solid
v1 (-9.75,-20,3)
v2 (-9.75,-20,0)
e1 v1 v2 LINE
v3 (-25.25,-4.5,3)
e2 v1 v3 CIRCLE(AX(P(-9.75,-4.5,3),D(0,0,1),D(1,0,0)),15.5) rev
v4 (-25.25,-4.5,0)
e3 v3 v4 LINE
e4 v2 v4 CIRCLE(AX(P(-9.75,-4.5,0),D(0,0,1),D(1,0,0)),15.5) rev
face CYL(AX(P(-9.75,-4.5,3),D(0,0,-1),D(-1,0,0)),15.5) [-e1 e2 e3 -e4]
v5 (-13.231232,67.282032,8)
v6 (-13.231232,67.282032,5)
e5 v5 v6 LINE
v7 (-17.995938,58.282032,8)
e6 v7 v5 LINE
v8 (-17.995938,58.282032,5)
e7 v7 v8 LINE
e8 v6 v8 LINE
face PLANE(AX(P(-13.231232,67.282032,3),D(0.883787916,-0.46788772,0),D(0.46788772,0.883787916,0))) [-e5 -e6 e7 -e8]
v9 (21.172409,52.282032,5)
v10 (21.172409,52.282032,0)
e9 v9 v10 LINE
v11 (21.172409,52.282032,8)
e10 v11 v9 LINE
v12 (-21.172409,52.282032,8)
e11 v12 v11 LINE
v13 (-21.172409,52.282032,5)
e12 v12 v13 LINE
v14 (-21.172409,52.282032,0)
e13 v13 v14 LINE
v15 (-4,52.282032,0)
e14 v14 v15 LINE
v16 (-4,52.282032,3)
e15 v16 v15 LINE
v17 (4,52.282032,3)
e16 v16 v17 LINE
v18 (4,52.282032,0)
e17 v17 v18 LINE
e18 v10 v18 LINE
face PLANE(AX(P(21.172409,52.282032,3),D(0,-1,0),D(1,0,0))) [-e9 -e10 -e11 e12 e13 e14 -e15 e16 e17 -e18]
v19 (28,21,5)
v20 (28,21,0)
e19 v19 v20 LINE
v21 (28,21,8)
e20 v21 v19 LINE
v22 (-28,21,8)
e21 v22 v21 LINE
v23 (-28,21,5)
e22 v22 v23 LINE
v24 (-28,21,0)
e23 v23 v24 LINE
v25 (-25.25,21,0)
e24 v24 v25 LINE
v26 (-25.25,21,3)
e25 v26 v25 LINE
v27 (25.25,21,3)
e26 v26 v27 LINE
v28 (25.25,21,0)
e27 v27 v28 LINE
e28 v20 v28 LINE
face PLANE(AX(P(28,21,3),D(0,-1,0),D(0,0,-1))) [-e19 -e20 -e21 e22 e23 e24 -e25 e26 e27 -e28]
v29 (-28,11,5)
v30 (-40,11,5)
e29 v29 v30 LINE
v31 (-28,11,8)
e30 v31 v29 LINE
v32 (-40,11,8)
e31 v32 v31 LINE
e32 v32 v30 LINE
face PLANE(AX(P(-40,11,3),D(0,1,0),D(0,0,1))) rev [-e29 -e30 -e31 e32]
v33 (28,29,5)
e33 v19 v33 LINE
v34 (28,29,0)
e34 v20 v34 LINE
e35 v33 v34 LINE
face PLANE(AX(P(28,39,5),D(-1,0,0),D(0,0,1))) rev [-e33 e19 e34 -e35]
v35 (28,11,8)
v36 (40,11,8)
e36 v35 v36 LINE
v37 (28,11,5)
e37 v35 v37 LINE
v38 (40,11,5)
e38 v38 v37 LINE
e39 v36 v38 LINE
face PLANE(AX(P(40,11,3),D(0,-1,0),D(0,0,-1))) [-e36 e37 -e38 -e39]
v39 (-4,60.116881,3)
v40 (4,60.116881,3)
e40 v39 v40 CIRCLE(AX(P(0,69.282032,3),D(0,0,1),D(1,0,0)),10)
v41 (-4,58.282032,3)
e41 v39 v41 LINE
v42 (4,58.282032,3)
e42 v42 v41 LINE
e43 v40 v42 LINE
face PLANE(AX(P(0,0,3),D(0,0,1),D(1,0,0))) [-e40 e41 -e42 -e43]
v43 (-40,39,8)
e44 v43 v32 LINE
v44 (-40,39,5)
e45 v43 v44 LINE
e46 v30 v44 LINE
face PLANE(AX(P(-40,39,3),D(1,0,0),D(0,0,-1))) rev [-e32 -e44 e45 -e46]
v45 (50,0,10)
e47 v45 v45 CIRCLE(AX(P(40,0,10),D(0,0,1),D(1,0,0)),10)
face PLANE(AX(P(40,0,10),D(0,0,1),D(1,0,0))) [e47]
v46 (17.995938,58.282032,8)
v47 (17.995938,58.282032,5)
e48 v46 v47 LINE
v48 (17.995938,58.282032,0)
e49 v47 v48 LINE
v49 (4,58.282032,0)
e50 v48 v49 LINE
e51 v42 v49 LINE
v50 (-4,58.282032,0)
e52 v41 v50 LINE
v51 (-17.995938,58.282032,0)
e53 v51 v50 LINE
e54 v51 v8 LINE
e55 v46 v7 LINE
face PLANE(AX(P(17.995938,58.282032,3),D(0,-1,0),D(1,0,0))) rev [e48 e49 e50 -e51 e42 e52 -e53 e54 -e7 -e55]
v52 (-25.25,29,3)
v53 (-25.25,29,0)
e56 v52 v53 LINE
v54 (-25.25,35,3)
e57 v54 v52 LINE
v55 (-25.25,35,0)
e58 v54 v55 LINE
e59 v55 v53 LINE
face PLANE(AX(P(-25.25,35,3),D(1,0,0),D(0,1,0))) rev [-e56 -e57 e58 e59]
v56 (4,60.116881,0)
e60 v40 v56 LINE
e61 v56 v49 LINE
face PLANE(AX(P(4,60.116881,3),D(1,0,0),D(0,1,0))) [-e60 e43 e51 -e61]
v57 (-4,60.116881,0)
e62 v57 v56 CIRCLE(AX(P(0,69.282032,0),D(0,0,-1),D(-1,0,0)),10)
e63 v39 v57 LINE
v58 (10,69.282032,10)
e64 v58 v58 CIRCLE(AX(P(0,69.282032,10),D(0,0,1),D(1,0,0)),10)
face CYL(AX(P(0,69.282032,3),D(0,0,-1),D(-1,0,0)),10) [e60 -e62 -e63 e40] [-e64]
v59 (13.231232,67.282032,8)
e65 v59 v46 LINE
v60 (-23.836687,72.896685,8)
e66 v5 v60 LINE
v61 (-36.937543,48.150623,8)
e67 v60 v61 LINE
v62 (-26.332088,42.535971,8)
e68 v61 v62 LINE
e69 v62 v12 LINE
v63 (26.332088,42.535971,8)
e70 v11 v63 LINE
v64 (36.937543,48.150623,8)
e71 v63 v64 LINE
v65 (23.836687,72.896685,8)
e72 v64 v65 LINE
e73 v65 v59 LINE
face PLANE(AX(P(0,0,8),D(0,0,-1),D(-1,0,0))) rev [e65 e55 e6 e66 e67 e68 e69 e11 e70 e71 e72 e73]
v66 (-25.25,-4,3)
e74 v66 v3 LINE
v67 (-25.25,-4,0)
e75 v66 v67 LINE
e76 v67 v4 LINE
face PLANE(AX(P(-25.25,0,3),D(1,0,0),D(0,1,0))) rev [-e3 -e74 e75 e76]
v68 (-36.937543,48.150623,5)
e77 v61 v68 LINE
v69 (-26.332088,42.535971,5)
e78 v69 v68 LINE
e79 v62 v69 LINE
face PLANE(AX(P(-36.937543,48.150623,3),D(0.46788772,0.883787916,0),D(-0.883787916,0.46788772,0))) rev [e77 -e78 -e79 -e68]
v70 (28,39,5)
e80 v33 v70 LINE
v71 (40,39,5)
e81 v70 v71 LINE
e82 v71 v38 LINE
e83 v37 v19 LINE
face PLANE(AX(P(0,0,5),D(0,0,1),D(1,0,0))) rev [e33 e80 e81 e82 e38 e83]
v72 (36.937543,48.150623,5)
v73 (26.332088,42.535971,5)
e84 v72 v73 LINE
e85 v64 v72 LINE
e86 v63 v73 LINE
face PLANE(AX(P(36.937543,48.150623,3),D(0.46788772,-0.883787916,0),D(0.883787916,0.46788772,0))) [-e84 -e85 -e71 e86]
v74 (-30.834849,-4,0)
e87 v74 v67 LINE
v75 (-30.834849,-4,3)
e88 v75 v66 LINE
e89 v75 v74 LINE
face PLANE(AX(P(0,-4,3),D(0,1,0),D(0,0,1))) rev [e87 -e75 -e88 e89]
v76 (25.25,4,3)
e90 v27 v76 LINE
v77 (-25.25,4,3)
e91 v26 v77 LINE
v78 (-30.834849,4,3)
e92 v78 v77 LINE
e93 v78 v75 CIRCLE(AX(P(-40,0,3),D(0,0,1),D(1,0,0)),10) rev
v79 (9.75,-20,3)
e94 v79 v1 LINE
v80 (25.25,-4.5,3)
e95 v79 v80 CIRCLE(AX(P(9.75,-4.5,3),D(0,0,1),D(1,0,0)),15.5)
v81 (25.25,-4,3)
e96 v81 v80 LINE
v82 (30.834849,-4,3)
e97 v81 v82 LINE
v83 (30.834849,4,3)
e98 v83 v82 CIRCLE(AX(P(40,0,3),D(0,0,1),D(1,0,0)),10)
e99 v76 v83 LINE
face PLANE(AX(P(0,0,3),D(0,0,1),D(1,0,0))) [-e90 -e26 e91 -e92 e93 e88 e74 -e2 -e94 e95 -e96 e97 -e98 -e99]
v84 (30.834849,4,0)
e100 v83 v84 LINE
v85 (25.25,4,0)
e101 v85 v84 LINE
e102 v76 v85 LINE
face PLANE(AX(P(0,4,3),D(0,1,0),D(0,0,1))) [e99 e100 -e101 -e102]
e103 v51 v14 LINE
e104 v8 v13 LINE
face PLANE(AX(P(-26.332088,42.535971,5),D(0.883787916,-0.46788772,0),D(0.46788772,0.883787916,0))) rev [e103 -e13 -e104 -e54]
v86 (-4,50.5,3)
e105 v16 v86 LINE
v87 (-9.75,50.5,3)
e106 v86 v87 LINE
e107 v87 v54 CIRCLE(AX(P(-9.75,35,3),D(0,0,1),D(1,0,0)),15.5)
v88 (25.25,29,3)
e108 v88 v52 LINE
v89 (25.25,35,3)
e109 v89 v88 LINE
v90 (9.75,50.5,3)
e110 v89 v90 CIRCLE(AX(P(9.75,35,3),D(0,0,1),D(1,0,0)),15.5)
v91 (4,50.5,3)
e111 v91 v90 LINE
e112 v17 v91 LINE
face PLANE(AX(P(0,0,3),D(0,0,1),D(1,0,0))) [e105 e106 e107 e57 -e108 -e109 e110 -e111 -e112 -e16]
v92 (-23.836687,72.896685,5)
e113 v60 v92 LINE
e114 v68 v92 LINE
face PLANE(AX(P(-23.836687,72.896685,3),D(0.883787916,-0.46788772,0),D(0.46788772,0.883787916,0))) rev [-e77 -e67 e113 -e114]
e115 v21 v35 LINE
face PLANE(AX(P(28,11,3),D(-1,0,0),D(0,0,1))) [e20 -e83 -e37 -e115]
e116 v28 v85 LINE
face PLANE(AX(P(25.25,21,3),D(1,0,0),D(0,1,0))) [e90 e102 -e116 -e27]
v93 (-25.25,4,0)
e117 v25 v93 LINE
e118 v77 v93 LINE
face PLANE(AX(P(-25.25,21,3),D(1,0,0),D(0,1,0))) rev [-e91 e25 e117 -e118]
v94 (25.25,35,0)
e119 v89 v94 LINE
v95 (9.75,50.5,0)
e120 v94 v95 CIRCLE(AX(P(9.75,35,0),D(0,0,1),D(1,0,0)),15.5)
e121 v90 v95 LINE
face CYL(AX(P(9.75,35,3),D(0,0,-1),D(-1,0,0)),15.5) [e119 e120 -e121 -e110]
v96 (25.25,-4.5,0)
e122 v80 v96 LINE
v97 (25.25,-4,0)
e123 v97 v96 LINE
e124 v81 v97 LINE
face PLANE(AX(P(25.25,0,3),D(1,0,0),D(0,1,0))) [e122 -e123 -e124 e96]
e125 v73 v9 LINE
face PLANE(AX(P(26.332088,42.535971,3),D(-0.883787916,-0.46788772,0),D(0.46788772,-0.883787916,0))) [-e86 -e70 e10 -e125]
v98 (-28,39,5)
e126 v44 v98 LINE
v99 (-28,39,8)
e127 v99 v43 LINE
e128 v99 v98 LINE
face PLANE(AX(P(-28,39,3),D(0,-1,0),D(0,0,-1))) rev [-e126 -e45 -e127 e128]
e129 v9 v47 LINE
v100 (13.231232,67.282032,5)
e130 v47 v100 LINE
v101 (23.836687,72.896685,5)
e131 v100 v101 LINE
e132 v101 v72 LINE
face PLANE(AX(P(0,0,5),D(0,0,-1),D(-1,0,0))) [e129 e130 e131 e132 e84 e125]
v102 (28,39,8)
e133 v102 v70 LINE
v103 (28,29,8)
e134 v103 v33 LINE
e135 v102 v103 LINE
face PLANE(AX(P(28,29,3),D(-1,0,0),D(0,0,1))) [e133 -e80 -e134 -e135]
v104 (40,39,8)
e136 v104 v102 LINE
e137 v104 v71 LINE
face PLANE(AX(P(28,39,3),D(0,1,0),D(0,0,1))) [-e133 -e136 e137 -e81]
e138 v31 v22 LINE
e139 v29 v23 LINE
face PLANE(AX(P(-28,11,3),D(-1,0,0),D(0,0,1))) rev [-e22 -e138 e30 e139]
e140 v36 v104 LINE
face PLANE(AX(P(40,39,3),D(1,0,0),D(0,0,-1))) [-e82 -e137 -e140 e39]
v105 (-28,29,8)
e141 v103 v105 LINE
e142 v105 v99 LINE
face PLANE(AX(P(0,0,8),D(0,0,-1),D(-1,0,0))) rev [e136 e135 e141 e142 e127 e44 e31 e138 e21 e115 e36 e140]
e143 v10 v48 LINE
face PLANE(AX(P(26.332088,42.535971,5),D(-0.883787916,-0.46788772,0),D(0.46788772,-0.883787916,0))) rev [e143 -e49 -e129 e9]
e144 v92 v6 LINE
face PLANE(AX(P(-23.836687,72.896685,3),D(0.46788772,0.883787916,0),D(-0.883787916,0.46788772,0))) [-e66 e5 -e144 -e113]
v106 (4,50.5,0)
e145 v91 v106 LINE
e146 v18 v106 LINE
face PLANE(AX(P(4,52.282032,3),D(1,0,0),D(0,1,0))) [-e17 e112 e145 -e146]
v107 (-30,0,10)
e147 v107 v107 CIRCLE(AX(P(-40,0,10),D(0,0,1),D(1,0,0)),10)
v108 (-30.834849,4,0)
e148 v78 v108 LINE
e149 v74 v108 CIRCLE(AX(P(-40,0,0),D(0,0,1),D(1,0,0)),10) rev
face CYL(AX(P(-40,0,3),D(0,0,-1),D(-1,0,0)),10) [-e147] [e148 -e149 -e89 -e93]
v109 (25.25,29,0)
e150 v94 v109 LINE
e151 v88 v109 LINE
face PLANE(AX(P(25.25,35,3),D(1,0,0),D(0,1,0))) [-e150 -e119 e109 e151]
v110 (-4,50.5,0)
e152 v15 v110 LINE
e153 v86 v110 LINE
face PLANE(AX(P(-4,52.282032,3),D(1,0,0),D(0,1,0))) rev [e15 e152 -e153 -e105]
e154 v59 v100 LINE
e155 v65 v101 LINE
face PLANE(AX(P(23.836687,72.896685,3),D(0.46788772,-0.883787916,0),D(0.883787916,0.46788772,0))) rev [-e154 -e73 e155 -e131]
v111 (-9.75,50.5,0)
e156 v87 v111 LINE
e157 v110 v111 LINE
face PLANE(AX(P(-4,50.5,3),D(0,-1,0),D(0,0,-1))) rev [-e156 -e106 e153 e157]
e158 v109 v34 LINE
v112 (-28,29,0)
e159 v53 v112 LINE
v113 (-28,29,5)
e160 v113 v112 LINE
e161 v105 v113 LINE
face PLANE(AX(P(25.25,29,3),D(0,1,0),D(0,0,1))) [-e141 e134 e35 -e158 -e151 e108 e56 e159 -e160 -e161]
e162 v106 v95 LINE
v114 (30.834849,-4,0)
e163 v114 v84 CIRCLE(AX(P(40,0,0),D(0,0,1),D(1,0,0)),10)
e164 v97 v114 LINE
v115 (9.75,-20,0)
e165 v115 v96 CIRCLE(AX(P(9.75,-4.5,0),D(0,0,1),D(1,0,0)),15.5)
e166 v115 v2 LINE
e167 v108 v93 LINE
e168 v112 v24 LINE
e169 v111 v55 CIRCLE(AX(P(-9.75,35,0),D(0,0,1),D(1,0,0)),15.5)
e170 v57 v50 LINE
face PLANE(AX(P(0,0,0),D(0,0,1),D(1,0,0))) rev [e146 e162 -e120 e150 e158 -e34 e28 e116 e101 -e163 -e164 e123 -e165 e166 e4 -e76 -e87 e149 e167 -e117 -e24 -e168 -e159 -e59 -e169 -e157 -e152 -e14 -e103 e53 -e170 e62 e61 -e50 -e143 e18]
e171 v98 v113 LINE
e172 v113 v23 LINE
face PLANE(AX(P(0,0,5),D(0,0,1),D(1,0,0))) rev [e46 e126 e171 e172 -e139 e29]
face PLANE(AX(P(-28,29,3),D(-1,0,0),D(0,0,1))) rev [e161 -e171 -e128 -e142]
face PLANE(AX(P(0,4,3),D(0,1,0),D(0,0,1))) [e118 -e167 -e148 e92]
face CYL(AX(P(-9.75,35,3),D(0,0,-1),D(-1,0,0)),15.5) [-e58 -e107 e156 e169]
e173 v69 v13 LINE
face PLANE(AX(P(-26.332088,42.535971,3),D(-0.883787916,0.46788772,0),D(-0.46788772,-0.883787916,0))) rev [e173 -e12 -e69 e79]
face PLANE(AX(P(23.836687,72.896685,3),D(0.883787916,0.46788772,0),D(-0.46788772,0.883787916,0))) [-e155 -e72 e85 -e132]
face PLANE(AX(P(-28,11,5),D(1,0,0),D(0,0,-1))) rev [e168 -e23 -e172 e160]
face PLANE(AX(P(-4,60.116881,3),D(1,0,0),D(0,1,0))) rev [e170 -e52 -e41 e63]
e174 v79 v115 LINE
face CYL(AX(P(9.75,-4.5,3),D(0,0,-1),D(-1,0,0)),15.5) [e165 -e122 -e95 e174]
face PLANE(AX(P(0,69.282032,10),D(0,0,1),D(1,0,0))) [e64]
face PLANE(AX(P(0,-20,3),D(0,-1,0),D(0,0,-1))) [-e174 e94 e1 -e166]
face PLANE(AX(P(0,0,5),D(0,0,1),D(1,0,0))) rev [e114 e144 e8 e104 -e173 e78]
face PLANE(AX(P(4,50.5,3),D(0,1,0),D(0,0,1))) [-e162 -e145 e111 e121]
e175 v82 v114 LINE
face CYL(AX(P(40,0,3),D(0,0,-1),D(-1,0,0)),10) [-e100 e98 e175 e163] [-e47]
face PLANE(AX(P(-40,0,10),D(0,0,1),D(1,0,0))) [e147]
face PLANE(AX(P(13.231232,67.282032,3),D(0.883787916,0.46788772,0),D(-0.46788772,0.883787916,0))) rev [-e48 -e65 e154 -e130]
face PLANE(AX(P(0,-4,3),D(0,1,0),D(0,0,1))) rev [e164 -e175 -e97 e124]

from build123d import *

# Parameters (mm, degrees)
BOSS_EXTRU_1_DEPTH      = 3
ESQUISSE2_R             = 10
BOSS_EXTRU_2_DEPTH      = 7
BOSS_EXTRU_3_DEPTH      = 5
ESQUISSE4_W             = 12
ESQUISSE4_H             = 28
ENL_V_MAT_EXTRU_1_DEPTH = 5


# Read off the part's stored shape, not the designer's step: Boss.-Extru.1
with BuildPart() as part:
    # Boss.-Extru.1 outline → Boss.-Extru.1 (new body)
    with BuildSketch(Plane.XY):
        with BuildLine():
            ThreePointArc((-25.25, -4.5), (-20.710155108, -15.460155108), (-9.75, -20))
            Line((-9.75, -20), (9.75, -20))
            ThreePointArc((9.75, -20), (20.710155108, -15.460155108), (25.25, -4.5))
            Line((25.25, -4.5), (25.25, -4))
            Line((25.25, -4), (30.83484861, -4))
            ThreePointArc((30.83484861, -4), (50, 0), (30.83484861, 4))
            Line((30.83484861, 4), (25.25, 4))
            Line((25.25, 4), (25.25, 21))
            Line((25.25, 21), (28, 21))
            Line((28, 21), (28, 11))
            Line((28, 11), (40, 11))
            Line((40, 11), (40, 39))
            Line((40, 39), (28, 39))
            Line((28, 39), (28, 29))
            Line((28, 29), (25.25, 29))
            Line((25.25, 29), (25.25, 35))
            ThreePointArc((25.25, 35), (20.710155108, 45.960155108), (9.75, 50.5))
            Line((9.75, 50.5), (4, 50.5))
            Line((4, 50.5), (4, 52.282032303))
            Line((4, 52.282032303), (21.172408726, 52.282032303))
            Line((21.172408726, 52.282032303), (26.332088428, 42.535970645))
            Line((26.332088428, 42.535970645), (36.937543424, 48.15062329))
            Line((36.937543424, 48.15062329), (23.836687252, 72.896684948))
            Line((23.836687252, 72.896684948), (13.231232256, 67.282032303))
            Line((13.231232256, 67.282032303), (17.995938138, 58.282032303))
            Line((17.995938138, 58.282032303), (4, 58.282032303))
            Line((4, 58.282032303), (4, 60.116880913))
            ThreePointArc((4, 60.116880913), (0, 79.282032303), (-4, 60.116880913))
            Line((-4, 60.116880913), (-4, 58.282032303))
            Line((-4, 58.282032303), (-17.995938138, 58.282032303))
            Line((-17.995938138, 58.282032303), (-13.231232256, 67.282032303))
            Line((-13.231232256, 67.282032303), (-23.836687252, 72.896684948))
            Line((-23.836687252, 72.896684948), (-36.937543424, 48.15062329))
            Line((-36.937543424, 48.15062329), (-26.332088428, 42.535970645))
            Line((-26.332088428, 42.535970645), (-21.172408726, 52.282032303))
            Line((-21.172408726, 52.282032303), (-4, 52.282032303))
            Line((-4, 52.282032303), (-4, 50.5))
            Line((-4, 50.5), (-9.75, 50.5))
            ThreePointArc((-9.75, 50.5), (-20.710155108, 45.960155108), (-25.25, 35))
            Line((-25.25, 35), (-25.25, 29))
            Line((-25.25, 29), (-28, 29))
            Line((-28, 29), (-28, 39))
            Line((-28, 39), (-40, 39))
            Line((-40, 39), (-40, 11))
            Line((-40, 11), (-28, 11))
            Line((-28, 11), (-28, 21))
            Line((-28, 21), (-25.25, 21))
            Line((-25.25, 21), (-25.25, 4))
            Line((-25.25, 4), (-30.83484861, 4))
            ThreePointArc((-30.83484861, 4), (-50, 0), (-30.83484861, -4))
            Line((-30.83484861, -4), (-25.25, -4))
            Line((-25.25, -4), (-25.25, -4.5))
        make_face()
    extrude(amount=BOSS_EXTRU_1_DEPTH)

    # Esquisse2 → Boss.-Extru.2 (add)
    with BuildSketch(Plane.XY.offset(3)):
        with Locations(Location((-40, 0, 0), (0, 0, 336.421821522))):
            Circle(ESQUISSE2_R)
        with Locations(Location((40, 0, 0), (0, 0, 156.421821522))):
            Circle(ESQUISSE2_R)
        with Locations(Location((0, 69.282032303, 0), (0, 0, 246.421821522))):
            Circle(ESQUISSE2_R)
    extrude(amount=BOSS_EXTRU_2_DEPTH)

    # Esquisse3 → Boss.-Extru.3 (add)
    with BuildSketch(Plane.XY.offset(3)):
        Polygon((23.836687252, 72.896684948), (36.937543424, 48.15062329), (26.332088428, 42.535970645), (21.172408726, 52.282032303), (-21.172408726, 52.282032303), (-26.332088428, 42.535970645), (-36.937543424, 48.15062329), (-23.836687252, 72.896684948), (-13.231232256, 67.282032303), (-17.995938138, 58.282032303), (17.995938138, 58.282032303), (13.231232256, 67.282032303), align=None)
        Polygon((28, 39), (40, 39), (40, 11), (28, 11), (28, 21), (-28, 21), (-28, 11), (-40, 11), (-40, 39), (-28, 39), (-28, 29), (28, 29), align=None)
    extrude(amount=BOSS_EXTRU_3_DEPTH)

    # Esquisse4 → Enlèv. mat.-Extru.1 (cut)
    with BuildSketch(Plane(origin=(0, 0, 0), x_dir=(-1, 0, 0), z_dir=(0, 0, -1))):
        with Locations((-34, 25)):
            Rectangle(ESQUISSE4_W, ESQUISSE4_H)
        Polygon((-36.937543424, 48.15062329), (-26.332088428, 42.535970645), (-13.231232256, 67.282032303), (-23.836687252, 72.896684948), align=None)
        Polygon((13.231232256, 67.282032303), (23.836687252, 72.896684948), (36.937543424, 48.15062329), (26.332088428, 42.535970645), align=None)
        with Locations((34, 25)):
            Rectangle(ESQUISSE4_W, ESQUISSE4_H)
    extrude(amount=-ENL_V_MAT_EXTRU_1_DEPTH, mode=Mode.SUBTRACT)


solid = part.part
